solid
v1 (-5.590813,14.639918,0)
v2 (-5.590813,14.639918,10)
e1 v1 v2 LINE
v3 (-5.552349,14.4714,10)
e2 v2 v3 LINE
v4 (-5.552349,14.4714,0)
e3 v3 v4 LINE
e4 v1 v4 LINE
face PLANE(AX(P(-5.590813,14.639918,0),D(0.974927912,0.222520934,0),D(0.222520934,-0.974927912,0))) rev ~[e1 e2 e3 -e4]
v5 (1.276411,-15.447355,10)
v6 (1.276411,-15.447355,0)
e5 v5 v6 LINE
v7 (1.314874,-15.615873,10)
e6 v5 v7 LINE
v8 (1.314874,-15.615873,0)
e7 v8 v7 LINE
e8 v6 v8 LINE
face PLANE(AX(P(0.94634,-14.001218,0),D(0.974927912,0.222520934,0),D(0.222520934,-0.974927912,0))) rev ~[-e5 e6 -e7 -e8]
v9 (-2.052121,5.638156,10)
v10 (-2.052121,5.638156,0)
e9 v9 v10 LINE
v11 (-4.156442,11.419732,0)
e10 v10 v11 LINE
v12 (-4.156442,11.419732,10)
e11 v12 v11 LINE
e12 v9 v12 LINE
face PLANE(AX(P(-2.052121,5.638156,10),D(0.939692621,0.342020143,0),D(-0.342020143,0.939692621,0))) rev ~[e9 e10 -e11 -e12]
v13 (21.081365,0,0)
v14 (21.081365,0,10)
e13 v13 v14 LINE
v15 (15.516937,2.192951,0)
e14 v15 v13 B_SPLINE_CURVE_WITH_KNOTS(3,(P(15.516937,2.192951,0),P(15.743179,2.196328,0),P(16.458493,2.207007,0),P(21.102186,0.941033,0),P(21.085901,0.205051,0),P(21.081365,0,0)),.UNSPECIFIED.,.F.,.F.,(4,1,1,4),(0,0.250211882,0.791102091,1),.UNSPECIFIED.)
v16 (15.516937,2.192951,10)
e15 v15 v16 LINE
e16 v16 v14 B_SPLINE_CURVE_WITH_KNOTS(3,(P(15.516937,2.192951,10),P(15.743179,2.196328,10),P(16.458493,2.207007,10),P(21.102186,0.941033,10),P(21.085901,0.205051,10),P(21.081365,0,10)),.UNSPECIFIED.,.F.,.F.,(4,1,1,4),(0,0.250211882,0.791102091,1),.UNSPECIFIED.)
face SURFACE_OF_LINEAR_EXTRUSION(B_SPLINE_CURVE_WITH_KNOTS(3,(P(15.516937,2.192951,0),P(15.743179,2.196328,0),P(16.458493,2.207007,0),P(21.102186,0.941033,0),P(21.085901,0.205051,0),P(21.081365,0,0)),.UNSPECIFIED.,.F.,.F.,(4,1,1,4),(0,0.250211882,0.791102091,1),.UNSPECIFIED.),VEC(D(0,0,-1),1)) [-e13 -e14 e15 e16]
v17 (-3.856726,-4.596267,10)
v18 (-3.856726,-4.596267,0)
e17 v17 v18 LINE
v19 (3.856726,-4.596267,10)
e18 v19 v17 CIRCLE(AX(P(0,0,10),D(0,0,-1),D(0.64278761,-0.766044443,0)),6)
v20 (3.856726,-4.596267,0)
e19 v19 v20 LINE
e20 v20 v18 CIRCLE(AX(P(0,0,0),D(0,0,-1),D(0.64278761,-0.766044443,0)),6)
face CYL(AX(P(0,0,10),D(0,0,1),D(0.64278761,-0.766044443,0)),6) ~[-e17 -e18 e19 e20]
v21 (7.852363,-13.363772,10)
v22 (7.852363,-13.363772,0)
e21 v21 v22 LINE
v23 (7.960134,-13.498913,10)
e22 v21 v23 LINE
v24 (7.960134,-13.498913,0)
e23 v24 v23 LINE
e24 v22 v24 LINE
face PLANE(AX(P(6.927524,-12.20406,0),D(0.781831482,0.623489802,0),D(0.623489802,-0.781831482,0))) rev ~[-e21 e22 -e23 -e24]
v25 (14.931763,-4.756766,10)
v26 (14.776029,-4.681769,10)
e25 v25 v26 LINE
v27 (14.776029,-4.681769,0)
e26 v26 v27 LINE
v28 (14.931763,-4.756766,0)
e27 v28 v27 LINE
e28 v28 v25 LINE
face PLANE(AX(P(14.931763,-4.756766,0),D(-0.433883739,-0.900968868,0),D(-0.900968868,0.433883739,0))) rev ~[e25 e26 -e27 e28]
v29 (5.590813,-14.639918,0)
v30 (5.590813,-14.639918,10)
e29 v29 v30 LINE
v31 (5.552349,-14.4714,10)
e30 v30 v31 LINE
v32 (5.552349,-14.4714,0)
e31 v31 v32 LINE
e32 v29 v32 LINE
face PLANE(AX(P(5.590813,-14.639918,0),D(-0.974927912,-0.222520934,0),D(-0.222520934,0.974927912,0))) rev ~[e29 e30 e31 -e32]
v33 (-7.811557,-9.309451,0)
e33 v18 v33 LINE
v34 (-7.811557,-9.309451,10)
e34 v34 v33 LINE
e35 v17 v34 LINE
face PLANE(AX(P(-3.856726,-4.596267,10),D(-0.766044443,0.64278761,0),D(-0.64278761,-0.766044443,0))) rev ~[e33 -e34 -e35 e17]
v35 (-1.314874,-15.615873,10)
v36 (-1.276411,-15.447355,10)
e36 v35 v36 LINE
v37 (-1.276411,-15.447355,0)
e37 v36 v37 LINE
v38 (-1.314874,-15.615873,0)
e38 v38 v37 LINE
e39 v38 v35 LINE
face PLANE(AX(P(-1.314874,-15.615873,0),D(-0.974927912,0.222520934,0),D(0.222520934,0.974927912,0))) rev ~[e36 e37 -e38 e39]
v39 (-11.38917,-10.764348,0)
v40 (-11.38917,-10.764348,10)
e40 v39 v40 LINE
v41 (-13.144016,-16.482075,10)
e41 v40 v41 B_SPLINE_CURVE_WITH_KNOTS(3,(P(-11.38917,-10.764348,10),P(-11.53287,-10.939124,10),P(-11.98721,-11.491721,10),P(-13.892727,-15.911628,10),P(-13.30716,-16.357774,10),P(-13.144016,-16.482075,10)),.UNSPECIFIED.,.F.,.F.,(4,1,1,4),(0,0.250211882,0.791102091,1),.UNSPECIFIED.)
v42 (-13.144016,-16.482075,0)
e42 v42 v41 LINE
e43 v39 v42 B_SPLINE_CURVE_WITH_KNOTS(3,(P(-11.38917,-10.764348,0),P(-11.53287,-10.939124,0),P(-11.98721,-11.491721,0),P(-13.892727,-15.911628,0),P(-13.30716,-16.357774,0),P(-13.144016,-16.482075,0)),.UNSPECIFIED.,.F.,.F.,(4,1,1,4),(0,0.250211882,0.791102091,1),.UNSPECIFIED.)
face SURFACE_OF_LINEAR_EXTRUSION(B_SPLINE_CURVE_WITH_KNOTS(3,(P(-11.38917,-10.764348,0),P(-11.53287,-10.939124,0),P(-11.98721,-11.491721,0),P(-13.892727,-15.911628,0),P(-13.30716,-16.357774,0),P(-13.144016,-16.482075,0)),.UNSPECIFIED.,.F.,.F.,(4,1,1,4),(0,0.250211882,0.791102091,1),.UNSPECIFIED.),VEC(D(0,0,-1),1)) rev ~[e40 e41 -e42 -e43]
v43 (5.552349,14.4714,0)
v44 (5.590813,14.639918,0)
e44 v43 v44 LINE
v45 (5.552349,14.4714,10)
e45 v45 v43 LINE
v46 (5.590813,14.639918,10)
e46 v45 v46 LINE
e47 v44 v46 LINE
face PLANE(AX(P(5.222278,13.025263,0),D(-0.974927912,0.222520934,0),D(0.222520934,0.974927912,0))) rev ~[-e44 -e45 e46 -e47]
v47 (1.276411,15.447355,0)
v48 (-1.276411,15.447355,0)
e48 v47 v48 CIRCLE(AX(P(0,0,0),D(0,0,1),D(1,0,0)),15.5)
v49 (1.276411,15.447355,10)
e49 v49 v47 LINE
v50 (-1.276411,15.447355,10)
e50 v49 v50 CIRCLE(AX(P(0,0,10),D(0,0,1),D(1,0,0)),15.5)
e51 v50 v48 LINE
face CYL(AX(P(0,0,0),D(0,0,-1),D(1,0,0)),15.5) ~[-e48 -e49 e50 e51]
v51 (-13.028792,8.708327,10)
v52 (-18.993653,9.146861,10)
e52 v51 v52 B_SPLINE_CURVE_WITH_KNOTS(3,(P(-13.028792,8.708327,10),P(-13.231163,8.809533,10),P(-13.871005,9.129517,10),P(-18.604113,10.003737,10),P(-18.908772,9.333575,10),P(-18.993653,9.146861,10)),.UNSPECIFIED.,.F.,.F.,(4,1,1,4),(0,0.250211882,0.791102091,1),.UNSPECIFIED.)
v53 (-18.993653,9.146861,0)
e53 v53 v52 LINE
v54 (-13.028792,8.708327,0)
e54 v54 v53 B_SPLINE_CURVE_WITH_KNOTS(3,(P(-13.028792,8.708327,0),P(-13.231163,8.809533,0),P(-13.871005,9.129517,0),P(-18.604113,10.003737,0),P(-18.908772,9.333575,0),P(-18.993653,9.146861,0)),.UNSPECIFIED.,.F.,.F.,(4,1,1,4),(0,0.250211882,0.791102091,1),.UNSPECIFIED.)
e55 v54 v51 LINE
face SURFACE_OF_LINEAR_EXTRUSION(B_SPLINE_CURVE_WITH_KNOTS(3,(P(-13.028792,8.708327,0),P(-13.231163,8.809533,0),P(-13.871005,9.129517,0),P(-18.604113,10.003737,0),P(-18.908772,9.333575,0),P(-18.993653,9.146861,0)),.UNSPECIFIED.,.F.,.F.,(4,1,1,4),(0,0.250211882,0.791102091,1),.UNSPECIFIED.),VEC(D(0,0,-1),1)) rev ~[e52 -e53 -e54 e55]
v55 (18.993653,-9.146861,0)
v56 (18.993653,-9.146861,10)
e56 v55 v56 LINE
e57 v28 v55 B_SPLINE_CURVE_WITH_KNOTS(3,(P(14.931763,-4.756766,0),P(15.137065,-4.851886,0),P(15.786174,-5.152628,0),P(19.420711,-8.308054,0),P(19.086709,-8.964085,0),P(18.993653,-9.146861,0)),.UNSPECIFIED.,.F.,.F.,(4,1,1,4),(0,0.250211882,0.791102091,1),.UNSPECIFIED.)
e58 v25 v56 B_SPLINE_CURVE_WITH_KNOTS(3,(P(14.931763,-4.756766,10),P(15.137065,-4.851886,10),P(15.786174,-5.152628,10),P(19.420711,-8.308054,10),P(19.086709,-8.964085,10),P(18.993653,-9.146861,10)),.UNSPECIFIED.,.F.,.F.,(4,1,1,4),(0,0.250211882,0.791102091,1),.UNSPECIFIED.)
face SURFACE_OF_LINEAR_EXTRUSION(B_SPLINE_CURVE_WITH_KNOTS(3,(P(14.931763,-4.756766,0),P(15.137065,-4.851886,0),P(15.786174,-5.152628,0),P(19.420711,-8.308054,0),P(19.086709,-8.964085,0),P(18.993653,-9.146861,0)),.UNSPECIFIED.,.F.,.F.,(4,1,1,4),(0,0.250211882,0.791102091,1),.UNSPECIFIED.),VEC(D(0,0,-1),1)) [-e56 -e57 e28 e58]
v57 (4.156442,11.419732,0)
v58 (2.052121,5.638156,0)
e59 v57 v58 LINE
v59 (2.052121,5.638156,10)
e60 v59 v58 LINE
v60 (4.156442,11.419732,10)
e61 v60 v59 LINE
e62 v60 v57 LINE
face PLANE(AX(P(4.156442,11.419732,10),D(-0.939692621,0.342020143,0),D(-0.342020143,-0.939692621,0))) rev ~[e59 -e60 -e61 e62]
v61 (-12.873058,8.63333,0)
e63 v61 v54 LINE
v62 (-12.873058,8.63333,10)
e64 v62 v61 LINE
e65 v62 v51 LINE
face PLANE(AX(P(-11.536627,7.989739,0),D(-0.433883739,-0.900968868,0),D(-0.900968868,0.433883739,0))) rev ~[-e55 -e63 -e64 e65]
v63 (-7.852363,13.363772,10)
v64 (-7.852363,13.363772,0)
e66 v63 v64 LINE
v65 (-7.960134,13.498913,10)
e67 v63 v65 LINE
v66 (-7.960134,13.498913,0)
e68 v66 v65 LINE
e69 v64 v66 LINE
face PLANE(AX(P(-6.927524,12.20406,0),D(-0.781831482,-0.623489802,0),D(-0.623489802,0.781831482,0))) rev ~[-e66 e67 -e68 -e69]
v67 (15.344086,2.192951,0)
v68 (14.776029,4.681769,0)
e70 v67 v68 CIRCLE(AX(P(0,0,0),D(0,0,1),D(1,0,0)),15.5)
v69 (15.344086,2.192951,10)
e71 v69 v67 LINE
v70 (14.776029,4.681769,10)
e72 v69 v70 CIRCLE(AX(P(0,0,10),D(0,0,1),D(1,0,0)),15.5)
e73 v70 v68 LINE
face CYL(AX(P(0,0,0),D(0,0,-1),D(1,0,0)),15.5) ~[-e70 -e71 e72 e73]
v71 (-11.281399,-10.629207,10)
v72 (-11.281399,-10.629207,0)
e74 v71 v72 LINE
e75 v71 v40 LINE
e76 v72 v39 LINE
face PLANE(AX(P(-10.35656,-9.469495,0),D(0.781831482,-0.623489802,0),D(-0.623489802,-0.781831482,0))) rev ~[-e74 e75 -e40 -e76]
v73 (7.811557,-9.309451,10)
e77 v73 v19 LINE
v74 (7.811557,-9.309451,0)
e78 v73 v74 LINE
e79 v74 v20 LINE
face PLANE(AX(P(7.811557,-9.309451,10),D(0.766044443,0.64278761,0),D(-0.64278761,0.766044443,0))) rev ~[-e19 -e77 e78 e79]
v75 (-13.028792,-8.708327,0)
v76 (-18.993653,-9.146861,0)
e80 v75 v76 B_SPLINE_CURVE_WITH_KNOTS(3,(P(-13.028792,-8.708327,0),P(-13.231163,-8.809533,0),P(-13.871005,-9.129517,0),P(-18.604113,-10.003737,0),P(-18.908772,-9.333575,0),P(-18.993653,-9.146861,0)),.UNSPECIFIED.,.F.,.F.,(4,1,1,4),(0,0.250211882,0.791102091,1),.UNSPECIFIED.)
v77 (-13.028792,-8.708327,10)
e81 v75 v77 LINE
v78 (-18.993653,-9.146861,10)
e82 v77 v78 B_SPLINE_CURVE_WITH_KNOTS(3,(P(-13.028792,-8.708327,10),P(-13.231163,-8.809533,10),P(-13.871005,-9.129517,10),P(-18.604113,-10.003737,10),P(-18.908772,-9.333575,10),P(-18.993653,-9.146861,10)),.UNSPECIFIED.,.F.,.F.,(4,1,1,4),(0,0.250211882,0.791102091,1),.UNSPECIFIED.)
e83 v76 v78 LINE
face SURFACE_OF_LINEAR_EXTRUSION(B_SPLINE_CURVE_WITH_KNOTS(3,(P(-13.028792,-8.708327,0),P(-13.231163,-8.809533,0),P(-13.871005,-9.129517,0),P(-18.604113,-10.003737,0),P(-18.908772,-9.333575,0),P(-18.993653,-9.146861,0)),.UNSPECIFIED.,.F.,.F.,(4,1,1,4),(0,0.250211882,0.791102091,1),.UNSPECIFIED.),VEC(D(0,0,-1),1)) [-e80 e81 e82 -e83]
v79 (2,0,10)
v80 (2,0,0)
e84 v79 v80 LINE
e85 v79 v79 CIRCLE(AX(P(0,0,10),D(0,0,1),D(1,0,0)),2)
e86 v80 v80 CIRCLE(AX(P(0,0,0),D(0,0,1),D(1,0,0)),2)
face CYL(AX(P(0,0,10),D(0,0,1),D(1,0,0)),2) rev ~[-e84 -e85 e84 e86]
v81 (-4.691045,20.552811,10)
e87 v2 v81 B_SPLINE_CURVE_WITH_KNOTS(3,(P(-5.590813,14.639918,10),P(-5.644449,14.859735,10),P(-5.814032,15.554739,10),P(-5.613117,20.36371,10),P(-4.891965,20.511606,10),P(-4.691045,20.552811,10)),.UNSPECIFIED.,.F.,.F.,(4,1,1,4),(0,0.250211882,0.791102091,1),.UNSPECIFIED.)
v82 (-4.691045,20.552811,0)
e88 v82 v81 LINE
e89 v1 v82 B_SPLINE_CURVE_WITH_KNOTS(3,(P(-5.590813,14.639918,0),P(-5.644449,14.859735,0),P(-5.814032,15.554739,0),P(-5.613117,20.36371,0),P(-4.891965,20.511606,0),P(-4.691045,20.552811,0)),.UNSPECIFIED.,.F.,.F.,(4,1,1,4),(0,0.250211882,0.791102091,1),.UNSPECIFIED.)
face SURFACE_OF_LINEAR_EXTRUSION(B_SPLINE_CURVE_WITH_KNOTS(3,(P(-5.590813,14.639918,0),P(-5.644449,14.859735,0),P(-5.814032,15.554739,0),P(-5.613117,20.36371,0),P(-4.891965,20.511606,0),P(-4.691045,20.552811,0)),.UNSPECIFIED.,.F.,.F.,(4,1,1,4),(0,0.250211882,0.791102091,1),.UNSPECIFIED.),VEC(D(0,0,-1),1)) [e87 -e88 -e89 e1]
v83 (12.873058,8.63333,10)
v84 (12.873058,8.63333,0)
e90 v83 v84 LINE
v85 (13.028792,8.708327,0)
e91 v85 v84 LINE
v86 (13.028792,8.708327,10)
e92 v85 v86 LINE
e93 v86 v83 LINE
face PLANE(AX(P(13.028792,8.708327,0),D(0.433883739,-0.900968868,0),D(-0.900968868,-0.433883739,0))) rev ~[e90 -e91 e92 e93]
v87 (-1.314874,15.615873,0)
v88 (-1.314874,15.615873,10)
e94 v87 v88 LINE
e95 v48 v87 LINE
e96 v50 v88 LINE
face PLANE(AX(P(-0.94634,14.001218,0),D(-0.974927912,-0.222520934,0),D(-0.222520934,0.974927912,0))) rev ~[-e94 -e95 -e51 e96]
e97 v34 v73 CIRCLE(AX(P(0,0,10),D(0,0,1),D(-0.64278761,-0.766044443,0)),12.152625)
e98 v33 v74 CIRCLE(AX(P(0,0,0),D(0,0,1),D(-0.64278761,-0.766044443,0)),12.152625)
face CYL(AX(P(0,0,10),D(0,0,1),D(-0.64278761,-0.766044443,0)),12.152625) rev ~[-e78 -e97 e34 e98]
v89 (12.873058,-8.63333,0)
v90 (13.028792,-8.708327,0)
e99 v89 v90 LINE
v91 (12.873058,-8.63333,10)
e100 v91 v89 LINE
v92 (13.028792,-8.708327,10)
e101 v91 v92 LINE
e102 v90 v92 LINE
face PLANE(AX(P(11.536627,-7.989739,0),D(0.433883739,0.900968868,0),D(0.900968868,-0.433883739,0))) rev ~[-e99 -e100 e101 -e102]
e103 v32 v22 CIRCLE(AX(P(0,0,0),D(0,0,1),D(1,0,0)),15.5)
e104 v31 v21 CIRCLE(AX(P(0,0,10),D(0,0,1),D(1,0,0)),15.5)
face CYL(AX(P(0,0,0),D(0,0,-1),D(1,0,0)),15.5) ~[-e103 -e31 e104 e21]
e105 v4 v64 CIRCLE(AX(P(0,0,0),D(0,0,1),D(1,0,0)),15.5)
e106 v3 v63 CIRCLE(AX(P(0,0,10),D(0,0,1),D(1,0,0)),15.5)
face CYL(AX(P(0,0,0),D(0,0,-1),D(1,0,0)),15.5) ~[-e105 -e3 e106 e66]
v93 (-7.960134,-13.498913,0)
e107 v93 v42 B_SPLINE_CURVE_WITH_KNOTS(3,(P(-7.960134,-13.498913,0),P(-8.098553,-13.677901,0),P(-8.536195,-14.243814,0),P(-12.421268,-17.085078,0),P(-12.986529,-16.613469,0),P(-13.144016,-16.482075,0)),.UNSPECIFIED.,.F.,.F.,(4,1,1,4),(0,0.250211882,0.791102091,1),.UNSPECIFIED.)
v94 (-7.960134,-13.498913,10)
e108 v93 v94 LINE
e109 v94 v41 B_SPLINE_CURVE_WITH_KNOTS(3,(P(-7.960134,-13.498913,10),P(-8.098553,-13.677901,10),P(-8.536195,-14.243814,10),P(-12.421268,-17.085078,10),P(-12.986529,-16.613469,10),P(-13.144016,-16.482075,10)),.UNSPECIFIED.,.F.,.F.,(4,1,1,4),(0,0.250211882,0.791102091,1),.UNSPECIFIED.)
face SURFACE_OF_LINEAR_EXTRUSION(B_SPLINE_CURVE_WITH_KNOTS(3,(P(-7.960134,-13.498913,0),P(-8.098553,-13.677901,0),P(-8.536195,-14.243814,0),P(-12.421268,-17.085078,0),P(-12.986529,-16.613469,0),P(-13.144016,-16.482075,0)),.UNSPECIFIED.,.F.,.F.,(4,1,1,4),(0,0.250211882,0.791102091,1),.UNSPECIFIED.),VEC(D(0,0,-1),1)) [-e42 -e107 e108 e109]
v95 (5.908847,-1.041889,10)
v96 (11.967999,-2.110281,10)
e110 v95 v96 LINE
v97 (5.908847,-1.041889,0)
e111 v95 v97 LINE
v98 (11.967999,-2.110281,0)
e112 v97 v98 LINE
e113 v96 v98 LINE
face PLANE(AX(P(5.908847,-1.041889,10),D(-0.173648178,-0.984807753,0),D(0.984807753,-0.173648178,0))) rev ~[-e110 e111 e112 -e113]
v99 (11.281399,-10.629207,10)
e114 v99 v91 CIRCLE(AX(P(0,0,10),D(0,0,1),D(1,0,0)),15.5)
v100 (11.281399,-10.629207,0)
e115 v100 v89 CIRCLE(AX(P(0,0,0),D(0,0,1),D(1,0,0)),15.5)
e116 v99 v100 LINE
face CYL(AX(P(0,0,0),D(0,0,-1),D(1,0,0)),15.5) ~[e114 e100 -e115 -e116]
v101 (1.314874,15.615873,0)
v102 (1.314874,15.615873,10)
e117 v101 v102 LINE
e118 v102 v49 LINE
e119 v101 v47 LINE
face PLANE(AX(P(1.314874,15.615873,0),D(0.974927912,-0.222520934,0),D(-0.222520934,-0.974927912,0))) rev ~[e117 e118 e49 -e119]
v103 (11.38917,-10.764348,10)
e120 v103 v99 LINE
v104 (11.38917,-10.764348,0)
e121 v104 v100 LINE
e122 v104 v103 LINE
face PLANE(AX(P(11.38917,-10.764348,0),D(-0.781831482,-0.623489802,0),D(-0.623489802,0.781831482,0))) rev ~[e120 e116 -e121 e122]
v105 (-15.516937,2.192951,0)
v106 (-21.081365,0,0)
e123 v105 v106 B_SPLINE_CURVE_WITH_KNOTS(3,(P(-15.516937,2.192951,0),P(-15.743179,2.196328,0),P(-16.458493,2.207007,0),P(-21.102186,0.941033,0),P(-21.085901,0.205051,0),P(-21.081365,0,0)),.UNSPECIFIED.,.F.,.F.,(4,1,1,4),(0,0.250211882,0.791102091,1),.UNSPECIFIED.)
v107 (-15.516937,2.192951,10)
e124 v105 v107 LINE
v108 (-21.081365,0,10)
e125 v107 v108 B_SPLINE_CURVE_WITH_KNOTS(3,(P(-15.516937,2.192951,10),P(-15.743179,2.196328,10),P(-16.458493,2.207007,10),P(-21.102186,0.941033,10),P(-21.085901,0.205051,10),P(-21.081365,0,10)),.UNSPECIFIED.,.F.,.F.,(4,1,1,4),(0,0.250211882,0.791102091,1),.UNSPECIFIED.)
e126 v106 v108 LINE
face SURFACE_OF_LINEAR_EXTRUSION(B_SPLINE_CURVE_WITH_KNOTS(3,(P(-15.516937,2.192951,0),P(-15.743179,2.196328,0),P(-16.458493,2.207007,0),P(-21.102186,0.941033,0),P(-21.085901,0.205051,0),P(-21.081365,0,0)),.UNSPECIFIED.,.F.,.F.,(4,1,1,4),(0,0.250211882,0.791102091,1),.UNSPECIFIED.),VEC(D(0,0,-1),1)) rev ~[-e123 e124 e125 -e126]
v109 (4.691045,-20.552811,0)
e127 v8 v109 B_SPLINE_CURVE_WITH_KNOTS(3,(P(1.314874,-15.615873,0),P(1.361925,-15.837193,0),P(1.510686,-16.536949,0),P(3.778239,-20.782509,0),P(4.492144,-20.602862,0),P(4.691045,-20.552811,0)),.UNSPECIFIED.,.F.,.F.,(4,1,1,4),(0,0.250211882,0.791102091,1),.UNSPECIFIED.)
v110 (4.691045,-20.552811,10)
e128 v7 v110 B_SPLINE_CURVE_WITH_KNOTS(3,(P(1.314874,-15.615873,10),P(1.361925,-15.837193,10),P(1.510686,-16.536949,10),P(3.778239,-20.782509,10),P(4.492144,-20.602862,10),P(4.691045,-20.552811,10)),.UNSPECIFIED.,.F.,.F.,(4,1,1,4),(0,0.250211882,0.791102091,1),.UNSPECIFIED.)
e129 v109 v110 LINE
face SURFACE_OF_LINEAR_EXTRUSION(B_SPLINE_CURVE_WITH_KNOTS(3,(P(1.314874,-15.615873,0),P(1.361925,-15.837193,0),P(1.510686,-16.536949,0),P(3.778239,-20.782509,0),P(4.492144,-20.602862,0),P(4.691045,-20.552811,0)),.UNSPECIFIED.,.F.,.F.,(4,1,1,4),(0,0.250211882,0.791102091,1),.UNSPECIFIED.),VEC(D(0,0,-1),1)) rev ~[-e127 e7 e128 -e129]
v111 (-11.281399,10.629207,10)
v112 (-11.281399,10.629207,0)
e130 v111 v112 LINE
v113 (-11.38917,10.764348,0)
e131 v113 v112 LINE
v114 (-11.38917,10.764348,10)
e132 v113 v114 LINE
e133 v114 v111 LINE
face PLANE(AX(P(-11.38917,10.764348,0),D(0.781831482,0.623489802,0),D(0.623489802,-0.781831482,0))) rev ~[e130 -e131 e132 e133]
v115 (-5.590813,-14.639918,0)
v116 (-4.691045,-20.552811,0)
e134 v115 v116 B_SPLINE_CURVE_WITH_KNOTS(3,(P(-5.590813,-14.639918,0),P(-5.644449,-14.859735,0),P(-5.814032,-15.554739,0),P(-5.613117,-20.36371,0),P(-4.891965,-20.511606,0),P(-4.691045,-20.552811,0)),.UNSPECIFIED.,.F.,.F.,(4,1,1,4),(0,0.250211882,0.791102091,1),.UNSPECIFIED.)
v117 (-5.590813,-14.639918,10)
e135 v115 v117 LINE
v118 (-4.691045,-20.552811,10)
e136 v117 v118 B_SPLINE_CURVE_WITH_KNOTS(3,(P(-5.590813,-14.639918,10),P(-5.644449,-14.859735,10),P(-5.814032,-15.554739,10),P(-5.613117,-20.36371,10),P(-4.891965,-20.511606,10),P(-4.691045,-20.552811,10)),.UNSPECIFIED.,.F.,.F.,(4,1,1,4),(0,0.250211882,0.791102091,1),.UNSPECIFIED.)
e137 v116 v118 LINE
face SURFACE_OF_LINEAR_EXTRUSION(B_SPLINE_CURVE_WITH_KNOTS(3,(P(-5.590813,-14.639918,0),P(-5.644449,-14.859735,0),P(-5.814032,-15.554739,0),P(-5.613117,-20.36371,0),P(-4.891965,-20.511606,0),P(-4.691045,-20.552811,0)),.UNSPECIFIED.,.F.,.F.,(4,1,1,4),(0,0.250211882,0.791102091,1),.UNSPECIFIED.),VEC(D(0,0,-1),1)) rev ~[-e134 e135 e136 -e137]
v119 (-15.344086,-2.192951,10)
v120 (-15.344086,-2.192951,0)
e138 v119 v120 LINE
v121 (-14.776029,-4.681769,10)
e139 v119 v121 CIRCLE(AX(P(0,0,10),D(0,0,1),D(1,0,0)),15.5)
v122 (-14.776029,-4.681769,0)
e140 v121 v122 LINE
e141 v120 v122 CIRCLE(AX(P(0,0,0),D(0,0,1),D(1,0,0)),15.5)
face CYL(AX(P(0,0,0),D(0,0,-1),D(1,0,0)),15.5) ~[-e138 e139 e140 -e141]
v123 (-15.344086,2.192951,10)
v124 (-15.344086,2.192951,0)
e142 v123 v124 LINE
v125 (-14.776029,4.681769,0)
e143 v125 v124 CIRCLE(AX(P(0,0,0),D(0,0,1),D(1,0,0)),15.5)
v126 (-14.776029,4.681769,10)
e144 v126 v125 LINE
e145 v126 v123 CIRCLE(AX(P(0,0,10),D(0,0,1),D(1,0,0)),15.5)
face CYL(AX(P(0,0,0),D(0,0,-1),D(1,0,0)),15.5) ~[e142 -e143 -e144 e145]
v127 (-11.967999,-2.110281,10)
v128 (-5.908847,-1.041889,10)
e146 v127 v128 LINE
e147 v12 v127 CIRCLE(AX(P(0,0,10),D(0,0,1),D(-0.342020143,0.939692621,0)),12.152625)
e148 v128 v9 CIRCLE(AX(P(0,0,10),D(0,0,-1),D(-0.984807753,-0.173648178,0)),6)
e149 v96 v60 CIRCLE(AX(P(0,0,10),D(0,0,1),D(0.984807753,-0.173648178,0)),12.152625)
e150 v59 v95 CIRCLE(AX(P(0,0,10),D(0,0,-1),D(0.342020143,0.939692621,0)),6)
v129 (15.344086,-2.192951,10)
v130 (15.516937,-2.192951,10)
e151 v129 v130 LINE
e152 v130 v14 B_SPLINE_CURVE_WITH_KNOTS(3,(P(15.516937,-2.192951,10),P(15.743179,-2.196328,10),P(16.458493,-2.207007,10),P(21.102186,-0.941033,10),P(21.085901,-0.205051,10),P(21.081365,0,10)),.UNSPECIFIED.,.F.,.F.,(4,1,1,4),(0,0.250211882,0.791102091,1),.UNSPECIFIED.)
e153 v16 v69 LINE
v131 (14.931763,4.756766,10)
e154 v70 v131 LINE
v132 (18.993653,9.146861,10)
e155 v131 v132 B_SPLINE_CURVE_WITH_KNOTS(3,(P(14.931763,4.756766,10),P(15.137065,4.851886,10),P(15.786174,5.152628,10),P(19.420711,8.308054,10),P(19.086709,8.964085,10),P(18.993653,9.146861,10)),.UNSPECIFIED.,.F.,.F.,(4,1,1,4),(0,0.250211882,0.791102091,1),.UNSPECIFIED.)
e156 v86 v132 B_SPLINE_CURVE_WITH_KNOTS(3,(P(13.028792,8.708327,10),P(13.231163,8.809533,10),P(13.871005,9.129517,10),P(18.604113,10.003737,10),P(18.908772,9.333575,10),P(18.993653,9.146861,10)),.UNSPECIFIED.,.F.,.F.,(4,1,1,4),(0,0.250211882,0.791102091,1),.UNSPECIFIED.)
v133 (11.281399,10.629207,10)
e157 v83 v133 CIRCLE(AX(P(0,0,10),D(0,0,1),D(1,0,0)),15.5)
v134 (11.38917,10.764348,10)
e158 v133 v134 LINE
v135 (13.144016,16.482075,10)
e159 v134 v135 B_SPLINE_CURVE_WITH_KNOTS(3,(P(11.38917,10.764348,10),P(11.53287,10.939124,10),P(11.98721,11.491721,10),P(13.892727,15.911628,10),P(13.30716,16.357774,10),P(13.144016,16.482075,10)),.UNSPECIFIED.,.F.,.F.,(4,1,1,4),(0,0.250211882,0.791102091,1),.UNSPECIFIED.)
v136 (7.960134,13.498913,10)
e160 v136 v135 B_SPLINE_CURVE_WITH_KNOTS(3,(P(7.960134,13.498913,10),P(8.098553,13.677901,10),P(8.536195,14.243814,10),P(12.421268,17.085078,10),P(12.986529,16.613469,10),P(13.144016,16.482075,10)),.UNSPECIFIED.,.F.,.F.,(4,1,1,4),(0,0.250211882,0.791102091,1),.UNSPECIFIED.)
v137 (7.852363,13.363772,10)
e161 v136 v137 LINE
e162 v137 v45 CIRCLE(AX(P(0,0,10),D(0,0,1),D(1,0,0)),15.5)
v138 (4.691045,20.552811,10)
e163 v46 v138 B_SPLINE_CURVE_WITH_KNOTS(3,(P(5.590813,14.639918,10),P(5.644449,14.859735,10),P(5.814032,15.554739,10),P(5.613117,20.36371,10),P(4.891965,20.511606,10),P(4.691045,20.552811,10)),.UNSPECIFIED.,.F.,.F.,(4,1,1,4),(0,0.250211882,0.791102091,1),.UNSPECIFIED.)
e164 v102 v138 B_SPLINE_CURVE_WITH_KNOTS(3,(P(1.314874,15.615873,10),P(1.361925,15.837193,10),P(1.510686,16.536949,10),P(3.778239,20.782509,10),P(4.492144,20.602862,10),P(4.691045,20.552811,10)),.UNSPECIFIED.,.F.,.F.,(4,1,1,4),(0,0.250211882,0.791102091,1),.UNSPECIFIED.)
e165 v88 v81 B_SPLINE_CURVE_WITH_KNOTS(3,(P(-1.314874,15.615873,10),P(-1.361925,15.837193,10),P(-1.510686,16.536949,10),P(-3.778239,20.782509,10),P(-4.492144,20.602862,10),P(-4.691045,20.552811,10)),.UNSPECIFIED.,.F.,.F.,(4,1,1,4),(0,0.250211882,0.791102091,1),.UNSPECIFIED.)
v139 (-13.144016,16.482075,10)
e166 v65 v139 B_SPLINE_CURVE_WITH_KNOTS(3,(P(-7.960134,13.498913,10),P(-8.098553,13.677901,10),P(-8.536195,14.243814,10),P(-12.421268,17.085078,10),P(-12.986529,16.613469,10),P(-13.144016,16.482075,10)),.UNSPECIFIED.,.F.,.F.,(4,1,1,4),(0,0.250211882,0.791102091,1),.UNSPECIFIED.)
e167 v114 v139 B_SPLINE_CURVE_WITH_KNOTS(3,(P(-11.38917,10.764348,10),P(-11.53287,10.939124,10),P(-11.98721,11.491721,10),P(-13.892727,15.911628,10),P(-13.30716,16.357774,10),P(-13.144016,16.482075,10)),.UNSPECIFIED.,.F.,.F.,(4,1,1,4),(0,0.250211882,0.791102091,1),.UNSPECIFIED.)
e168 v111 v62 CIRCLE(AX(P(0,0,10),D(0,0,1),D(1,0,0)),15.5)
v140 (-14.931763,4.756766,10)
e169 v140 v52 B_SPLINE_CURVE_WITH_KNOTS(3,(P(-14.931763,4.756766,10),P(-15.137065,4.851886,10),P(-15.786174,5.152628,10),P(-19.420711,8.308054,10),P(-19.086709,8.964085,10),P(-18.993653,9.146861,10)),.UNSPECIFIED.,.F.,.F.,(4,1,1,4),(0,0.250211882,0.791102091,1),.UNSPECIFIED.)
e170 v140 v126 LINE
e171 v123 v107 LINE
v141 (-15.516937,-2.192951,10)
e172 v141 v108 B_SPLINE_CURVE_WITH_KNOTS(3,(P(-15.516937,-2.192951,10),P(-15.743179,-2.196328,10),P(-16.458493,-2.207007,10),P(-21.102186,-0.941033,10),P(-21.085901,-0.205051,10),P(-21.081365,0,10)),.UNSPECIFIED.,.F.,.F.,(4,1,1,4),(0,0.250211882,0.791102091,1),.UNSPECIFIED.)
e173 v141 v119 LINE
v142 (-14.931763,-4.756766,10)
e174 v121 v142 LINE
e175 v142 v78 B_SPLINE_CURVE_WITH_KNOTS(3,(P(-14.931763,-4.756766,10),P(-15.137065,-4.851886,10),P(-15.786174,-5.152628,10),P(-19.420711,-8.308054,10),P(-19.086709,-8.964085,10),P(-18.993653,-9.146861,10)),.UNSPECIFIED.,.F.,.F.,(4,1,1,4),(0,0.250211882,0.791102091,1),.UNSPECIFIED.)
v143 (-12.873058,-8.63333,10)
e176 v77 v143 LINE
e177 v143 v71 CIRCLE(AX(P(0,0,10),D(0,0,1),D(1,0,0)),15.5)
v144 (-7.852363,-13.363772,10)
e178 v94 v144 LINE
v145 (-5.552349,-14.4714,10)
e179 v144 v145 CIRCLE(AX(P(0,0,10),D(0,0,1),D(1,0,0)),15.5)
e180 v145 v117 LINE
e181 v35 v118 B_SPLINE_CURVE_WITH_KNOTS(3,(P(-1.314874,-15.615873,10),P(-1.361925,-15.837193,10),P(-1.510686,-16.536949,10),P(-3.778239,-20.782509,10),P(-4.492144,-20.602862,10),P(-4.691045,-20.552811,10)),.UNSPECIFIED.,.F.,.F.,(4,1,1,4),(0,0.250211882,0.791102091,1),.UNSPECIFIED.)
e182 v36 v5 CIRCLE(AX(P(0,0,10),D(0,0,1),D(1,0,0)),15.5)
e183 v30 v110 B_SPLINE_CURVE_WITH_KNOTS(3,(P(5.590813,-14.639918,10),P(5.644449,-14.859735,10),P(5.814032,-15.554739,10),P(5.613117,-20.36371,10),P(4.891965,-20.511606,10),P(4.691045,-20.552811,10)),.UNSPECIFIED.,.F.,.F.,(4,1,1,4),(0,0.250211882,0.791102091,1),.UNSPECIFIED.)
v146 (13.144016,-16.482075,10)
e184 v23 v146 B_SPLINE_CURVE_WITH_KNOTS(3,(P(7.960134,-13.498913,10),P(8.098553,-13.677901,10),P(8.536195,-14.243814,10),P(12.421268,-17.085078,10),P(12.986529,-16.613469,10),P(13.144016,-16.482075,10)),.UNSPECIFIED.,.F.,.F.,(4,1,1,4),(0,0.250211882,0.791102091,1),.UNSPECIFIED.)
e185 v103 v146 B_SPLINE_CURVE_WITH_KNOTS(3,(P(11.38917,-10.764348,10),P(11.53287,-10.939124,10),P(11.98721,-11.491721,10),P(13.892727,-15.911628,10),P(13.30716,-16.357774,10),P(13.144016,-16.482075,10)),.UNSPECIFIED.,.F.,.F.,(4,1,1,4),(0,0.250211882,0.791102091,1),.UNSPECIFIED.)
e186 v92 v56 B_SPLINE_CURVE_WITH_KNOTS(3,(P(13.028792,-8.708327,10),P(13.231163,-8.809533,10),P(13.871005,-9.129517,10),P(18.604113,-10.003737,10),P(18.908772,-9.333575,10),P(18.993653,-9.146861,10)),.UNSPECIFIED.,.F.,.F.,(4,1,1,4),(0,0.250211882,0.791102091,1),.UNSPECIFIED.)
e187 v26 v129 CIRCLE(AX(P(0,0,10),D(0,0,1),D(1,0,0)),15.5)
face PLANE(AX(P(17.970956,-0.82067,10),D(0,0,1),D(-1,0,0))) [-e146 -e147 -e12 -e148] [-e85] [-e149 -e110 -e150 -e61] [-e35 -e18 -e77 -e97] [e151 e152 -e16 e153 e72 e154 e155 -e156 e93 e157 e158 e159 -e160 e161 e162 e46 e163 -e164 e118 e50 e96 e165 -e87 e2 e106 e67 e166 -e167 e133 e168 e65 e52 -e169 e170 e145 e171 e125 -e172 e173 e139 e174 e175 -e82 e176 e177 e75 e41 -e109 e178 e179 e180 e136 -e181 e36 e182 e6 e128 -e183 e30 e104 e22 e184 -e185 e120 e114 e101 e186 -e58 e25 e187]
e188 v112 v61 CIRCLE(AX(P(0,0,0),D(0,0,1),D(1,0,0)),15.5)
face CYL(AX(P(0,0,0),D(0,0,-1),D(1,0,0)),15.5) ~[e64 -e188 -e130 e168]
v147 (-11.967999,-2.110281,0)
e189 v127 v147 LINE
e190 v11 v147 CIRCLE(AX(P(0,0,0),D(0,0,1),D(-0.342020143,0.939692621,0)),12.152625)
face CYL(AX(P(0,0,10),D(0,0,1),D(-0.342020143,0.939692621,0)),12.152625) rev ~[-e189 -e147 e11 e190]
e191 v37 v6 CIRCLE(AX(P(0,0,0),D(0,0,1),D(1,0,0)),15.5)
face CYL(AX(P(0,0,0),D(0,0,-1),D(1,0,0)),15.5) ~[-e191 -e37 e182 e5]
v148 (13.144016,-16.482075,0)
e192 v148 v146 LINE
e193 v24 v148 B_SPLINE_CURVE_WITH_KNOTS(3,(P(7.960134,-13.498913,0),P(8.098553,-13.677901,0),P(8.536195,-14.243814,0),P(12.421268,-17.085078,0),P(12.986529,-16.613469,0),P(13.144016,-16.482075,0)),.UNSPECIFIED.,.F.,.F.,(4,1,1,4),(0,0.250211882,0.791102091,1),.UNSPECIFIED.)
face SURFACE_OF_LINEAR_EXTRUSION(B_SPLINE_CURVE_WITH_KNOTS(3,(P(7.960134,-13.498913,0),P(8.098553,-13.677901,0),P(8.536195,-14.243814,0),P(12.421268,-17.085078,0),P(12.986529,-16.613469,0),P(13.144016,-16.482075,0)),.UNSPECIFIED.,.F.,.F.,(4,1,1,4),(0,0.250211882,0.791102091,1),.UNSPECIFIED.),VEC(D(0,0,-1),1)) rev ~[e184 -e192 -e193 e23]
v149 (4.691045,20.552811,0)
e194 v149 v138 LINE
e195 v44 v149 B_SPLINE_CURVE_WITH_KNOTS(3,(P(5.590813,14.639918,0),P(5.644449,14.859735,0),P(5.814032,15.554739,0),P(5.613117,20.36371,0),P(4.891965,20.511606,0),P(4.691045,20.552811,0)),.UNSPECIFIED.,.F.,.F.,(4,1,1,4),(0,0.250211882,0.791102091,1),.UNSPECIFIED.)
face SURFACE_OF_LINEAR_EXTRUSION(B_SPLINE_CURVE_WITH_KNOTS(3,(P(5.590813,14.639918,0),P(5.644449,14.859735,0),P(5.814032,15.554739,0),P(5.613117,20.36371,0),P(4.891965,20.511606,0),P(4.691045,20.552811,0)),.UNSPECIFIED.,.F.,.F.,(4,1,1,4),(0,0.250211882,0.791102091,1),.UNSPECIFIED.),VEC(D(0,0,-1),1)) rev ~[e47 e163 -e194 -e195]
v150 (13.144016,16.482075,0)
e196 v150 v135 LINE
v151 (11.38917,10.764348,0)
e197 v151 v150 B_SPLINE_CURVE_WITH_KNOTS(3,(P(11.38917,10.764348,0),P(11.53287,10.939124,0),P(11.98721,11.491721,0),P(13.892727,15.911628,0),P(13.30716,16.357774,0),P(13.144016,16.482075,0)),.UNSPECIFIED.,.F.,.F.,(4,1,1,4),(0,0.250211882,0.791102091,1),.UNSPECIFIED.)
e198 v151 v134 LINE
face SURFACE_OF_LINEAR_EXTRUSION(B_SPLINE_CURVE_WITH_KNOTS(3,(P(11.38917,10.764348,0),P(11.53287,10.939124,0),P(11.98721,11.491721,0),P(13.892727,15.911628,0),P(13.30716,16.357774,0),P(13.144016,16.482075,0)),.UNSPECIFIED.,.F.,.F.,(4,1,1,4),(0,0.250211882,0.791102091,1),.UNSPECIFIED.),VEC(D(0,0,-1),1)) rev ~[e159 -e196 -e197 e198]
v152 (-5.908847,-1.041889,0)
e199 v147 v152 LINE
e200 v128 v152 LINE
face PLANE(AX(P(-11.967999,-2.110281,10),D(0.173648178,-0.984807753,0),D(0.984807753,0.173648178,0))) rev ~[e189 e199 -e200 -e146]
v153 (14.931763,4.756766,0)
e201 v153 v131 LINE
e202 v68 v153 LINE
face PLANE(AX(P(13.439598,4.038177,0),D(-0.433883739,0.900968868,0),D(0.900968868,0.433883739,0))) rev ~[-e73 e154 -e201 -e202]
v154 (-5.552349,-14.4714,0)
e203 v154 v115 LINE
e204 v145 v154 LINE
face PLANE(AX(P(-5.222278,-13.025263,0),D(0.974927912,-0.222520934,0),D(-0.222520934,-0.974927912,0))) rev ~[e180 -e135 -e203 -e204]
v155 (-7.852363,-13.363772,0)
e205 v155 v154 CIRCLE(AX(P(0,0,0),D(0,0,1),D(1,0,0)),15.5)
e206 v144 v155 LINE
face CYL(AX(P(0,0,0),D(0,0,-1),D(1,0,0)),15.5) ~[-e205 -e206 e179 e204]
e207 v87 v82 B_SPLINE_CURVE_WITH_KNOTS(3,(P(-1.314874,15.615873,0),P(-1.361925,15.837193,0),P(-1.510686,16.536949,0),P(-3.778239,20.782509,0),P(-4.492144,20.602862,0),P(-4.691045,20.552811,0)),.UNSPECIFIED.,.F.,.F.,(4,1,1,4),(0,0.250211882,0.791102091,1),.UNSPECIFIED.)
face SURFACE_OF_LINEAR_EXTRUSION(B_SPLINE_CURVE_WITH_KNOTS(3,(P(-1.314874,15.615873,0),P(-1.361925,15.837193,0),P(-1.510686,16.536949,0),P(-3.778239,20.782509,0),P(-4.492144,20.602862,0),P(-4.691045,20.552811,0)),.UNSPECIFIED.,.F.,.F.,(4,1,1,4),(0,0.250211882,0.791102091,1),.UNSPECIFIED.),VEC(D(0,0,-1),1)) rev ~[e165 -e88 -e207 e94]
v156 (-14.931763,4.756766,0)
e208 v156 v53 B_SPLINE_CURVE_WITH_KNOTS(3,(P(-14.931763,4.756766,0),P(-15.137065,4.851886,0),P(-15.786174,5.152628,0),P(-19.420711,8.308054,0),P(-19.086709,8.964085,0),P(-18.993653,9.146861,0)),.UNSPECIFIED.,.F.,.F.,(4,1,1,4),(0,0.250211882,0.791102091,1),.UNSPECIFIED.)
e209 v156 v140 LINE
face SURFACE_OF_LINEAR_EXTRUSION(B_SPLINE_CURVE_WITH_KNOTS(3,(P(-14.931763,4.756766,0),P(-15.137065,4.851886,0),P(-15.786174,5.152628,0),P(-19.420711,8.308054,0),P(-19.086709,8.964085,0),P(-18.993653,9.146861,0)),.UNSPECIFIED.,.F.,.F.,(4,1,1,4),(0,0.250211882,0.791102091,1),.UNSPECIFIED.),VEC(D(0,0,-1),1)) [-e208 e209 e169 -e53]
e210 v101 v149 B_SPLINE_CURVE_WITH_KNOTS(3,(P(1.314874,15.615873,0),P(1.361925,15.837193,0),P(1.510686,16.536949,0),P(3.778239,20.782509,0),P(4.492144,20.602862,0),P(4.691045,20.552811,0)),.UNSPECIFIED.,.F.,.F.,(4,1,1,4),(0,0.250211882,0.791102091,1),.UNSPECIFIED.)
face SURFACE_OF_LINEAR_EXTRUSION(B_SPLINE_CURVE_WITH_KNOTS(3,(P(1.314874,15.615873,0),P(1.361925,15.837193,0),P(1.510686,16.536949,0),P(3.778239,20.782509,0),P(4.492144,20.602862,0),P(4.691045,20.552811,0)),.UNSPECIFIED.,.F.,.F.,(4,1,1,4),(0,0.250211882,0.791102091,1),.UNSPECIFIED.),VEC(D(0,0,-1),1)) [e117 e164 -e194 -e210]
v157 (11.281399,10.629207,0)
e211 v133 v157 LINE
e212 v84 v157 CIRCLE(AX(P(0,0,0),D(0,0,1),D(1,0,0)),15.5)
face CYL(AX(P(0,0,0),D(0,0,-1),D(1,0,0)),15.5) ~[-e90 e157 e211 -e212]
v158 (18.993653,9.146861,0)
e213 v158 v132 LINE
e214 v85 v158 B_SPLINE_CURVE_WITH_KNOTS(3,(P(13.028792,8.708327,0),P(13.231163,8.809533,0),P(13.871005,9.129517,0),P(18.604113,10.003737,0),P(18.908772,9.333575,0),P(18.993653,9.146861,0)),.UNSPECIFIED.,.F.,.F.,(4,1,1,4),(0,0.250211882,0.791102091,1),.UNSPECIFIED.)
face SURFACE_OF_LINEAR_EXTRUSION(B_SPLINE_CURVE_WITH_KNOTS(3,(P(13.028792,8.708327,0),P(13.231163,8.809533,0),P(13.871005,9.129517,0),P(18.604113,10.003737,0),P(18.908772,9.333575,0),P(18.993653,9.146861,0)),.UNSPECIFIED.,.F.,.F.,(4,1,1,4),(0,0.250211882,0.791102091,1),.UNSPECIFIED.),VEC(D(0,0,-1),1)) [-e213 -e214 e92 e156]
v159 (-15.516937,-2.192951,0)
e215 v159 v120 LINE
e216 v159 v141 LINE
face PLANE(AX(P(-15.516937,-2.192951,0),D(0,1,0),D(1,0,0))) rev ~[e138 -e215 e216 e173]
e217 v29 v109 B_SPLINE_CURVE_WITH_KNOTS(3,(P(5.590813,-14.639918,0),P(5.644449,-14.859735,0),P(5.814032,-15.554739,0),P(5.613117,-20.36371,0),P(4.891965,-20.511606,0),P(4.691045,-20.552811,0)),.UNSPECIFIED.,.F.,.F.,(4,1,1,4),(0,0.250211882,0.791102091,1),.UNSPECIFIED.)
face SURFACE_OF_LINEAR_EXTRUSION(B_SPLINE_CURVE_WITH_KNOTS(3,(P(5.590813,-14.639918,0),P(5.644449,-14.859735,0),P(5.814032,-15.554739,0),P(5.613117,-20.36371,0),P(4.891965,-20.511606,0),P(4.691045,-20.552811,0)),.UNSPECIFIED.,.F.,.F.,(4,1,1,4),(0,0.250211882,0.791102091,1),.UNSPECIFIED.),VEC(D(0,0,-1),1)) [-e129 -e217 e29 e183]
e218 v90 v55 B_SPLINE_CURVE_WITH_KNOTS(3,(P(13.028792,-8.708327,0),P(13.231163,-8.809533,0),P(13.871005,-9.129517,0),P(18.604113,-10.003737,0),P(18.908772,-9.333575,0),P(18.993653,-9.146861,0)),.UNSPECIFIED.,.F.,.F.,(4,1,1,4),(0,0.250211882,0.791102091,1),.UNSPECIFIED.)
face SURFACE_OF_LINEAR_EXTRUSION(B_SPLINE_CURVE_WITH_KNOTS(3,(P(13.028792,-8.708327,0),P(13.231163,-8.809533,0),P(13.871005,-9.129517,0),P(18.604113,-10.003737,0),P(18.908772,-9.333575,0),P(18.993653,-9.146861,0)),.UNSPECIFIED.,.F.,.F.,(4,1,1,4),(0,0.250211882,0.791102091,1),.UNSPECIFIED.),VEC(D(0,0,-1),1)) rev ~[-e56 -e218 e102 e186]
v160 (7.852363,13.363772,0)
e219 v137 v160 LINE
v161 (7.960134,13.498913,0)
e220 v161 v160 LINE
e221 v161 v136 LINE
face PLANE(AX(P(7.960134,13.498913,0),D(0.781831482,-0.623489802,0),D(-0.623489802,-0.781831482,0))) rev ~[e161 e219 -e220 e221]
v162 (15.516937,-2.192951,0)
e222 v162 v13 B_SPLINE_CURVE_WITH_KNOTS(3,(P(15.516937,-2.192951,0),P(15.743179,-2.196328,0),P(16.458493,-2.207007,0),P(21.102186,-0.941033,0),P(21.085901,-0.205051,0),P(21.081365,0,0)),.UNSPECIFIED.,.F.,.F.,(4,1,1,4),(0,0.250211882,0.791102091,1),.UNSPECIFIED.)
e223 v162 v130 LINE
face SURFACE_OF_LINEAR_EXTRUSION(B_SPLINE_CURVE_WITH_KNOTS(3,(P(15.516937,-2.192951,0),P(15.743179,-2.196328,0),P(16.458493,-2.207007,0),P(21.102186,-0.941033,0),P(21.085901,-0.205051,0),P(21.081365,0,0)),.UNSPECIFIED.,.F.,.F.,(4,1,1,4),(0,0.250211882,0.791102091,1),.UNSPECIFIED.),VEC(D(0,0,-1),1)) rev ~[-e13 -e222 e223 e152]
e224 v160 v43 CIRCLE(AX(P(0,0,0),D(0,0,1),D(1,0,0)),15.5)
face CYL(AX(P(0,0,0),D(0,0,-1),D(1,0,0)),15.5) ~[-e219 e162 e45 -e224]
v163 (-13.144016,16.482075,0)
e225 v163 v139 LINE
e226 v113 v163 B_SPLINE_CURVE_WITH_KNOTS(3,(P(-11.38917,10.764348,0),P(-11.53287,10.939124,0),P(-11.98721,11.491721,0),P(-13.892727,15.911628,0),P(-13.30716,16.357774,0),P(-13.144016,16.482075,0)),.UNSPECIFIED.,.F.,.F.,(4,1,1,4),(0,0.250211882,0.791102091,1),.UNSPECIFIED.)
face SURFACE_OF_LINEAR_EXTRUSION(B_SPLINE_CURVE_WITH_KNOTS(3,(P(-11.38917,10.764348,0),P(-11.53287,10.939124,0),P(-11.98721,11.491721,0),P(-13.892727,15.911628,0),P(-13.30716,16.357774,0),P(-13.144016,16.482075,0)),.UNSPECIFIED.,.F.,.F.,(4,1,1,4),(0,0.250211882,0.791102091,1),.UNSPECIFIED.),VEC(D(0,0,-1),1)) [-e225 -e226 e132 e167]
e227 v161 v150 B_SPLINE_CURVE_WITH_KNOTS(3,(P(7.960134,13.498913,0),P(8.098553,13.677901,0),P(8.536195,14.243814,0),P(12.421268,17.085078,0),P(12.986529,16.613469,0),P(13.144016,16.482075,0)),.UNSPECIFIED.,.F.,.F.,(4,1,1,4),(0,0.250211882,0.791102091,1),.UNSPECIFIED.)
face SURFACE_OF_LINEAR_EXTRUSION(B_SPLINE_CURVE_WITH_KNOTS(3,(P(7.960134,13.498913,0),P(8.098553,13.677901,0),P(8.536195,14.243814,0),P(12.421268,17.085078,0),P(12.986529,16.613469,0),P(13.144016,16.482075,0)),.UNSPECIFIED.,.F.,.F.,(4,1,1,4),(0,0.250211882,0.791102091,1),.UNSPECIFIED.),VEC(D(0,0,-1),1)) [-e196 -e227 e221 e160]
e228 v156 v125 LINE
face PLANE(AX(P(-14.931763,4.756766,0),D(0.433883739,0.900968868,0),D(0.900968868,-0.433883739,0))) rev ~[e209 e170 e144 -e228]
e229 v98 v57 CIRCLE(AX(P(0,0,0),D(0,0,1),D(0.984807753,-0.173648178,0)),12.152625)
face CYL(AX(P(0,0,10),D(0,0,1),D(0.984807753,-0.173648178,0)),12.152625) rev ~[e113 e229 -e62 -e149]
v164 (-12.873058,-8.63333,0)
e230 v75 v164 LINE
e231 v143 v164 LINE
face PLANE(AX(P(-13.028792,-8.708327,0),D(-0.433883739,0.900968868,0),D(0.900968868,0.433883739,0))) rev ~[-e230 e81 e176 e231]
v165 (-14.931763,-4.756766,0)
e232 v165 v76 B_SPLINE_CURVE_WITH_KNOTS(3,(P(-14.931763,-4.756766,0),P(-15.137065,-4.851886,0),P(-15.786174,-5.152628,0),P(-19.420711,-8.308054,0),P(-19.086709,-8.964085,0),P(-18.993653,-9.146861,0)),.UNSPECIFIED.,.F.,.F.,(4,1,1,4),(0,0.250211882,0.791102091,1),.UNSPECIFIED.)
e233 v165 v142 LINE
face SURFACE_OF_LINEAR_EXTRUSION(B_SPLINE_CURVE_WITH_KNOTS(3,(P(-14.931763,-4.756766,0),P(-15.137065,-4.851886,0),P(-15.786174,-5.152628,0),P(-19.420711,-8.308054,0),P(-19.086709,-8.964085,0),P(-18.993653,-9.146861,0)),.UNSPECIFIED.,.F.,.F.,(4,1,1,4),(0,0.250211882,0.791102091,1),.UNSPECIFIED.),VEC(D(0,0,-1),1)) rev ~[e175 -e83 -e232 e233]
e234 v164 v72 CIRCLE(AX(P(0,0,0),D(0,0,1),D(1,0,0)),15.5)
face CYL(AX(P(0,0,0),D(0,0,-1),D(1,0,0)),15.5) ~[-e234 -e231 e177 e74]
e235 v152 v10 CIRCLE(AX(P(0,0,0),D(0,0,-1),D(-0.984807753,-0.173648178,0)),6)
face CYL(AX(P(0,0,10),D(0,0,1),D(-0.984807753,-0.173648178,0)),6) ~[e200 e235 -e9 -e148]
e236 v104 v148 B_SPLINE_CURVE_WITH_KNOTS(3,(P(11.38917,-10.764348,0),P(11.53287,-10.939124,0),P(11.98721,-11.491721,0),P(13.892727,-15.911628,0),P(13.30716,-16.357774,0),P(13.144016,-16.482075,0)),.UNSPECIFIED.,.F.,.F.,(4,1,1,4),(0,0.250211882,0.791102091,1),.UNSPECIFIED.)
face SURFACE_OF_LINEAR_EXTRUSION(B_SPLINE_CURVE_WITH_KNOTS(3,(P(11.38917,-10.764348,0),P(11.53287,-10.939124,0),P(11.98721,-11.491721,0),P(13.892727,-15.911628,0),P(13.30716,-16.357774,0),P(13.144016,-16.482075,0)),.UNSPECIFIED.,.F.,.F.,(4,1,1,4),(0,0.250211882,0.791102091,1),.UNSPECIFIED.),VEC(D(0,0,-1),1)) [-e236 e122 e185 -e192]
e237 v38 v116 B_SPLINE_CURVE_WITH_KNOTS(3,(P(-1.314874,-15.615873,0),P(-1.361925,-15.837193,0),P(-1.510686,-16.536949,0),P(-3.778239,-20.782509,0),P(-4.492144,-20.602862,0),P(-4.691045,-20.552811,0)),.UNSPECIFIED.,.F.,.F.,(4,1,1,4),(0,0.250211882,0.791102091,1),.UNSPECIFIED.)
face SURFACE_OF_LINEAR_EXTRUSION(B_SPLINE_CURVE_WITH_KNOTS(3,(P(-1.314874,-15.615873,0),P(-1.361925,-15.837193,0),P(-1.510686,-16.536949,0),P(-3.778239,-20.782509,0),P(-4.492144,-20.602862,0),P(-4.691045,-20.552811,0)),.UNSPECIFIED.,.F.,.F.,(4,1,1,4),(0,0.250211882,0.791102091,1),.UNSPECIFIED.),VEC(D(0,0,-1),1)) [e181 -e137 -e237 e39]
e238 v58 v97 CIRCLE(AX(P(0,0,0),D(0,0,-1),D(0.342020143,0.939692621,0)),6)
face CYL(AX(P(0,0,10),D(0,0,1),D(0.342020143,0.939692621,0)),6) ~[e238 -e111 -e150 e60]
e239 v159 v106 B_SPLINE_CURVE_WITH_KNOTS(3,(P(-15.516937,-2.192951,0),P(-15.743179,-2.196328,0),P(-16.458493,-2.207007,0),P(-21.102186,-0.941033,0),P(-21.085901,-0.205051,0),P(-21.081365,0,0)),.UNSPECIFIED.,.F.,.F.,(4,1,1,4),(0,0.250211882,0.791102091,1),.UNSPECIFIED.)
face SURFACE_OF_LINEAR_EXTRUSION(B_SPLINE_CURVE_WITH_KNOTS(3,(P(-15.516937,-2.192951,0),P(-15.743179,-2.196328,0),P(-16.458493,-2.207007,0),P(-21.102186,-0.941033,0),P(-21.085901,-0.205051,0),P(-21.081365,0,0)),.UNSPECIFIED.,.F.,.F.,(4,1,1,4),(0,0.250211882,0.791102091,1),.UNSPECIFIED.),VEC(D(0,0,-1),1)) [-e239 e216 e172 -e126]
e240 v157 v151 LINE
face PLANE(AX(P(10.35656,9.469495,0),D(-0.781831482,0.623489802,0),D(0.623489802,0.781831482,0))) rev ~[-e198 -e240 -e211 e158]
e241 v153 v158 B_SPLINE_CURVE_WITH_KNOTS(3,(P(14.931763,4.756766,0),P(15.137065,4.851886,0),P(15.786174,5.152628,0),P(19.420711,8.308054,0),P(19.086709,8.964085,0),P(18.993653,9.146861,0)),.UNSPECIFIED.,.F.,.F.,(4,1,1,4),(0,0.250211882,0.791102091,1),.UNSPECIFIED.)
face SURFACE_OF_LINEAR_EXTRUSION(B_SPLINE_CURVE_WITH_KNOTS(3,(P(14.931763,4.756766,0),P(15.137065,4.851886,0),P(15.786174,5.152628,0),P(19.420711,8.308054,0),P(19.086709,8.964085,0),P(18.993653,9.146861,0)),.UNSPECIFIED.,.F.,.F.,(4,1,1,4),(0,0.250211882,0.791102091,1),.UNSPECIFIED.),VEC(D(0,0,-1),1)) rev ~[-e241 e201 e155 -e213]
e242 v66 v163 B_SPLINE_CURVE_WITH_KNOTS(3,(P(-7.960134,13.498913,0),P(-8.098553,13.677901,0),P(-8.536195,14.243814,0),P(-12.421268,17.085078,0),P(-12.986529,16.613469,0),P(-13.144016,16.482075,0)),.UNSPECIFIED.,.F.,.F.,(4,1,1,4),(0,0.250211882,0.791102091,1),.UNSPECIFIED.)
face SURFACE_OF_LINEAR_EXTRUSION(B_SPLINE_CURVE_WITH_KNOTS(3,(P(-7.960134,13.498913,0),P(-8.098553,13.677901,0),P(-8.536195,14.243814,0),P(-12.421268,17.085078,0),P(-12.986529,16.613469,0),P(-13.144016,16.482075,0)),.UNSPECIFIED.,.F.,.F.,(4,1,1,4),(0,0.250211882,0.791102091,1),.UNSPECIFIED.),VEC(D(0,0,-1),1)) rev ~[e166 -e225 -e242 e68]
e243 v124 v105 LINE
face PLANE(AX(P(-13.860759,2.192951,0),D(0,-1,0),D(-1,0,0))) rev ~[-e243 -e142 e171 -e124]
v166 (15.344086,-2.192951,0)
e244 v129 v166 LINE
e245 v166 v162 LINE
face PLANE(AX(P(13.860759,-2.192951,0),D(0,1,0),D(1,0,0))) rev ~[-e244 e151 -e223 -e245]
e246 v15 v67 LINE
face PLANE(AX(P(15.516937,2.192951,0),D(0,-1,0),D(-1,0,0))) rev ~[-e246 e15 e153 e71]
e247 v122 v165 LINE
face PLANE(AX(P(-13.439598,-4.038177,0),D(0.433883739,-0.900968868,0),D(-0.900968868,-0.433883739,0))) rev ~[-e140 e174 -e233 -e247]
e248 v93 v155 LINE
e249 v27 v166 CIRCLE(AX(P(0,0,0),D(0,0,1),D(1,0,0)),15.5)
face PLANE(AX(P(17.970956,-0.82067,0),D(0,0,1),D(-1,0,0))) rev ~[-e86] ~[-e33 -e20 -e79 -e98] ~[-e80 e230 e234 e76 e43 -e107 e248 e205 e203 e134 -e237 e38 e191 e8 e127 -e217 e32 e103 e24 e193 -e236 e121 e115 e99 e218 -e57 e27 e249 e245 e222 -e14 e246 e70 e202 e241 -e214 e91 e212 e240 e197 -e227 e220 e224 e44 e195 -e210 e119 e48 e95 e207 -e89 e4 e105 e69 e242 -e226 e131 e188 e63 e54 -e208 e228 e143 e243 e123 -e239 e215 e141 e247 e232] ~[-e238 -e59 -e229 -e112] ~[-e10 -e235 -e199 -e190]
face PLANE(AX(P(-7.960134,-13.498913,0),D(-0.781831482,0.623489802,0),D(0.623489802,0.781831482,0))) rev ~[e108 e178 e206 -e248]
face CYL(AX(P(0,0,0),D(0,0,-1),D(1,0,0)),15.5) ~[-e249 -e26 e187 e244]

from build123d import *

# Parameters (mm, degrees)
F0_R     = 5.3351790251
F1_DEPTH = 10
F2_DEPTH = 10
F3_COUNT = 14
F4_R     = 15.5
F5_DEPTH = 10
F8_DEPTH = 10
F7_R     = 2
F9_DEPTH = 10


# Not quite as in the source:
# - a feature names something its author has since deleted; it is built from what else it names


with BuildPart() as f1:
    # F0 (on Top) → F1 (new body)
    with BuildSketch(Plane.XY):
        Circle(F0_R)
    extrude(amount=F1_DEPTH)



with BuildPart() as f2:
    # F0 (on Top) → F2 (new body)
    with BuildSketch(Plane.XY):
        with BuildLine():
            Line((-21.0813645951, 0), (-15.5169374102, 0))
            Line((-15.5169374102, 0), (-15.5169374102, 2.1929510403))
            add(Edge.make_bspline(
                [(-15.5169374102, 2.1929510403), (-15.7431787684, 2.1963284468), (-16.4584927159, 2.2070069607), (-21.1021855068, 0.9410331304), (-21.0859014535, 0.2050513008), (-21.0813645951, 0)],
                knots=[0, 0, 0, 0, 0.2502118821, 0.7911020914, 1, 1, 1, 1], degree=3))
        make_face()
        Polygon((-15.5169374102, -2.1929510403), (-13.8607590251, -2.1929510403), (-13.8607590251, 2.1929510403), (-15.5169374102, 2.1929510403), (-15.5169374102, 0), align=None)
        with BuildLine():
            add(Edge.make_bspline(
                [(-15.5169374102, -2.1929510403), (-15.7431787684, -2.1963284468), (-16.4584927159, -2.2070069607), (-21.1021855068, -0.9410331304), (-21.0859014535, -0.2050513008), (-21.0813645951, 0)],
                knots=[0, 0, 0, 0, 0.2502118821, 0.7911020914, 1, 1, 1, 1], degree=3))
            Line((-15.5169374102, -2.1929510403), (-15.5169374102, 0))
            Line((-15.5169374102, 0), (-21.0813645951, 0))
        make_face()
    extrude(amount=F2_DEPTH)


with BuildPart() as f3_1:
    # F3: instance of F2
    add(f2.part.rotate(Axis((0, 0, 10), (0, 0, 1)), 1 * 360 / F3_COUNT))


with BuildPart() as f3_2:
    # F3: instance of F2
    add(f2.part.rotate(Axis((0, 0, 10), (0, 0, 1)), 2 * 360 / F3_COUNT))


with BuildPart() as f3_3:
    # F3: instance of F2
    add(f2.part.rotate(Axis((0, 0, 10), (0, 0, 1)), 3 * 360 / F3_COUNT))


with BuildPart() as f3_4:
    # F3: instance of F2
    add(f2.part.rotate(Axis((0, 0, 10), (0, 0, 1)), 4 * 360 / F3_COUNT))


with BuildPart() as f3_5:
    # F3: instance of F2
    add(f2.part.rotate(Axis((0, 0, 10), (0, 0, 1)), 5 * 360 / F3_COUNT))


with BuildPart() as f3_6:
    # F3: instance of F2
    add(f2.part.rotate(Axis((0, 0, 10), (0, 0, 1)), 6 * 360 / F3_COUNT))


with BuildPart() as f3_7:
    # F3: instance of F2
    add(f2.part.rotate(Axis((0, 0, 10), (0, 0, 1)), 7 * 360 / F3_COUNT))


with BuildPart() as f3_8:
    # F3: instance of F2
    add(f2.part.rotate(Axis((0, 0, 10), (0, 0, 1)), 8 * 360 / F3_COUNT))


with BuildPart() as f3_9:
    # F3: instance of F2
    add(f2.part.rotate(Axis((0, 0, 10), (0, 0, 1)), 9 * 360 / F3_COUNT))


with BuildPart() as f3_10:
    # F3: instance of F2
    add(f2.part.rotate(Axis((0, 0, 10), (0, 0, 1)), 10 * 360 / F3_COUNT))


with BuildPart() as f3_11:
    # F3: instance of F2
    add(f2.part.rotate(Axis((0, 0, 10), (0, 0, 1)), 11 * 360 / F3_COUNT))


with BuildPart() as f3_12:
    # F3: instance of F2
    add(f2.part.rotate(Axis((0, 0, 10), (0, 0, 1)), 12 * 360 / F3_COUNT))


with BuildPart() as f3_13:
    # F3: instance of F2
    add(f2.part.rotate(Axis((0, 0, 10), (0, 0, 1)), 13 * 360 / F3_COUNT))


with BuildPart() as f1_1:
    add(f1.part)

    add(f2.part)  # F5 merges F2

    add(f3_1.part)  # F5 merges F3_1

    add(f3_2.part)  # F5 merges F3_2

    add(f3_3.part)  # F5 merges F3_3

    add(f3_4.part)  # F5 merges F3_4

    add(f3_5.part)  # F5 merges F3_5

    add(f3_6.part)  # F5 merges F3_6

    add(f3_7.part)  # F5 merges F3_7

    add(f3_8.part)  # F5 merges F3_8

    add(f3_9.part)  # F5 merges F3_9

    add(f3_10.part)  # F5 merges F3_10

    add(f3_11.part)  # F5 merges F3_11

    add(f3_12.part)  # F5 merges F3_12

    add(f3_13.part)  # F5 merges F3_13
    # F4 (on Top) → F5 (join)
    with BuildSketch(Plane.XY):
        Circle(F4_R)
    extrude(amount=F5_DEPTH)

    # F6 (on face) → F8 (cut, through all)
    with BuildSketch(Plane.XY.offset(10)):
        with BuildLine():
            ThreePointArc((-5.9088465181, -1.041889066), (-5.1961524227, 3), (-2.05212086, 5.6381557247))
            Line((-2.05212086, 5.6381557247), (-4.1564424219, 11.4197316993))
            ThreePointArc((-4.1564424219, 11.4197316993), (-10.5244816627, 6.076312321), (-11.967998967, -2.110281123))
            Line((-11.967998967, -2.110281123), (-5.9088465181, -1.041889066))
        make_face()
        with BuildLine():
            Line((-3.8567256581, -4.5962666587), (-7.8115565451, -9.3094505764))
            ThreePointArc((-7.8115565451, -9.3094505764), (0, -12.1526246421), (7.8115565451, -9.3094505764))
            Line((7.8115565451, -9.3094505764), (3.8567256581, -4.5962666587))
            ThreePointArc((3.8567256581, -4.5962666587), (0, -6), (-3.8567256581, -4.5962666587))
        make_face()
        with BuildLine():
            ThreePointArc((2.05212086, 5.6381557247), (5.1961524227, 3), (5.9088465181, -1.041889066))
            Line((5.9088465181, -1.041889066), (11.967998967, -2.110281123))
            ThreePointArc((11.967998967, -2.110281123), (10.5244816627, 6.076312321), (4.1564424219, 11.4197316993))
            Line((4.1564424219, 11.4197316993), (2.05212086, 5.6381557247))
        make_face()
    extrude(amount=-F8_DEPTH, mode=Mode.SUBTRACT)

    # F7 (on face) → F9 (cut, through all)
    with BuildSketch(Plane.XY.offset(10)):
        Circle(F7_R)
    extrude(amount=-F9_DEPTH, mode=Mode.SUBTRACT)


solid = f1_1.part
